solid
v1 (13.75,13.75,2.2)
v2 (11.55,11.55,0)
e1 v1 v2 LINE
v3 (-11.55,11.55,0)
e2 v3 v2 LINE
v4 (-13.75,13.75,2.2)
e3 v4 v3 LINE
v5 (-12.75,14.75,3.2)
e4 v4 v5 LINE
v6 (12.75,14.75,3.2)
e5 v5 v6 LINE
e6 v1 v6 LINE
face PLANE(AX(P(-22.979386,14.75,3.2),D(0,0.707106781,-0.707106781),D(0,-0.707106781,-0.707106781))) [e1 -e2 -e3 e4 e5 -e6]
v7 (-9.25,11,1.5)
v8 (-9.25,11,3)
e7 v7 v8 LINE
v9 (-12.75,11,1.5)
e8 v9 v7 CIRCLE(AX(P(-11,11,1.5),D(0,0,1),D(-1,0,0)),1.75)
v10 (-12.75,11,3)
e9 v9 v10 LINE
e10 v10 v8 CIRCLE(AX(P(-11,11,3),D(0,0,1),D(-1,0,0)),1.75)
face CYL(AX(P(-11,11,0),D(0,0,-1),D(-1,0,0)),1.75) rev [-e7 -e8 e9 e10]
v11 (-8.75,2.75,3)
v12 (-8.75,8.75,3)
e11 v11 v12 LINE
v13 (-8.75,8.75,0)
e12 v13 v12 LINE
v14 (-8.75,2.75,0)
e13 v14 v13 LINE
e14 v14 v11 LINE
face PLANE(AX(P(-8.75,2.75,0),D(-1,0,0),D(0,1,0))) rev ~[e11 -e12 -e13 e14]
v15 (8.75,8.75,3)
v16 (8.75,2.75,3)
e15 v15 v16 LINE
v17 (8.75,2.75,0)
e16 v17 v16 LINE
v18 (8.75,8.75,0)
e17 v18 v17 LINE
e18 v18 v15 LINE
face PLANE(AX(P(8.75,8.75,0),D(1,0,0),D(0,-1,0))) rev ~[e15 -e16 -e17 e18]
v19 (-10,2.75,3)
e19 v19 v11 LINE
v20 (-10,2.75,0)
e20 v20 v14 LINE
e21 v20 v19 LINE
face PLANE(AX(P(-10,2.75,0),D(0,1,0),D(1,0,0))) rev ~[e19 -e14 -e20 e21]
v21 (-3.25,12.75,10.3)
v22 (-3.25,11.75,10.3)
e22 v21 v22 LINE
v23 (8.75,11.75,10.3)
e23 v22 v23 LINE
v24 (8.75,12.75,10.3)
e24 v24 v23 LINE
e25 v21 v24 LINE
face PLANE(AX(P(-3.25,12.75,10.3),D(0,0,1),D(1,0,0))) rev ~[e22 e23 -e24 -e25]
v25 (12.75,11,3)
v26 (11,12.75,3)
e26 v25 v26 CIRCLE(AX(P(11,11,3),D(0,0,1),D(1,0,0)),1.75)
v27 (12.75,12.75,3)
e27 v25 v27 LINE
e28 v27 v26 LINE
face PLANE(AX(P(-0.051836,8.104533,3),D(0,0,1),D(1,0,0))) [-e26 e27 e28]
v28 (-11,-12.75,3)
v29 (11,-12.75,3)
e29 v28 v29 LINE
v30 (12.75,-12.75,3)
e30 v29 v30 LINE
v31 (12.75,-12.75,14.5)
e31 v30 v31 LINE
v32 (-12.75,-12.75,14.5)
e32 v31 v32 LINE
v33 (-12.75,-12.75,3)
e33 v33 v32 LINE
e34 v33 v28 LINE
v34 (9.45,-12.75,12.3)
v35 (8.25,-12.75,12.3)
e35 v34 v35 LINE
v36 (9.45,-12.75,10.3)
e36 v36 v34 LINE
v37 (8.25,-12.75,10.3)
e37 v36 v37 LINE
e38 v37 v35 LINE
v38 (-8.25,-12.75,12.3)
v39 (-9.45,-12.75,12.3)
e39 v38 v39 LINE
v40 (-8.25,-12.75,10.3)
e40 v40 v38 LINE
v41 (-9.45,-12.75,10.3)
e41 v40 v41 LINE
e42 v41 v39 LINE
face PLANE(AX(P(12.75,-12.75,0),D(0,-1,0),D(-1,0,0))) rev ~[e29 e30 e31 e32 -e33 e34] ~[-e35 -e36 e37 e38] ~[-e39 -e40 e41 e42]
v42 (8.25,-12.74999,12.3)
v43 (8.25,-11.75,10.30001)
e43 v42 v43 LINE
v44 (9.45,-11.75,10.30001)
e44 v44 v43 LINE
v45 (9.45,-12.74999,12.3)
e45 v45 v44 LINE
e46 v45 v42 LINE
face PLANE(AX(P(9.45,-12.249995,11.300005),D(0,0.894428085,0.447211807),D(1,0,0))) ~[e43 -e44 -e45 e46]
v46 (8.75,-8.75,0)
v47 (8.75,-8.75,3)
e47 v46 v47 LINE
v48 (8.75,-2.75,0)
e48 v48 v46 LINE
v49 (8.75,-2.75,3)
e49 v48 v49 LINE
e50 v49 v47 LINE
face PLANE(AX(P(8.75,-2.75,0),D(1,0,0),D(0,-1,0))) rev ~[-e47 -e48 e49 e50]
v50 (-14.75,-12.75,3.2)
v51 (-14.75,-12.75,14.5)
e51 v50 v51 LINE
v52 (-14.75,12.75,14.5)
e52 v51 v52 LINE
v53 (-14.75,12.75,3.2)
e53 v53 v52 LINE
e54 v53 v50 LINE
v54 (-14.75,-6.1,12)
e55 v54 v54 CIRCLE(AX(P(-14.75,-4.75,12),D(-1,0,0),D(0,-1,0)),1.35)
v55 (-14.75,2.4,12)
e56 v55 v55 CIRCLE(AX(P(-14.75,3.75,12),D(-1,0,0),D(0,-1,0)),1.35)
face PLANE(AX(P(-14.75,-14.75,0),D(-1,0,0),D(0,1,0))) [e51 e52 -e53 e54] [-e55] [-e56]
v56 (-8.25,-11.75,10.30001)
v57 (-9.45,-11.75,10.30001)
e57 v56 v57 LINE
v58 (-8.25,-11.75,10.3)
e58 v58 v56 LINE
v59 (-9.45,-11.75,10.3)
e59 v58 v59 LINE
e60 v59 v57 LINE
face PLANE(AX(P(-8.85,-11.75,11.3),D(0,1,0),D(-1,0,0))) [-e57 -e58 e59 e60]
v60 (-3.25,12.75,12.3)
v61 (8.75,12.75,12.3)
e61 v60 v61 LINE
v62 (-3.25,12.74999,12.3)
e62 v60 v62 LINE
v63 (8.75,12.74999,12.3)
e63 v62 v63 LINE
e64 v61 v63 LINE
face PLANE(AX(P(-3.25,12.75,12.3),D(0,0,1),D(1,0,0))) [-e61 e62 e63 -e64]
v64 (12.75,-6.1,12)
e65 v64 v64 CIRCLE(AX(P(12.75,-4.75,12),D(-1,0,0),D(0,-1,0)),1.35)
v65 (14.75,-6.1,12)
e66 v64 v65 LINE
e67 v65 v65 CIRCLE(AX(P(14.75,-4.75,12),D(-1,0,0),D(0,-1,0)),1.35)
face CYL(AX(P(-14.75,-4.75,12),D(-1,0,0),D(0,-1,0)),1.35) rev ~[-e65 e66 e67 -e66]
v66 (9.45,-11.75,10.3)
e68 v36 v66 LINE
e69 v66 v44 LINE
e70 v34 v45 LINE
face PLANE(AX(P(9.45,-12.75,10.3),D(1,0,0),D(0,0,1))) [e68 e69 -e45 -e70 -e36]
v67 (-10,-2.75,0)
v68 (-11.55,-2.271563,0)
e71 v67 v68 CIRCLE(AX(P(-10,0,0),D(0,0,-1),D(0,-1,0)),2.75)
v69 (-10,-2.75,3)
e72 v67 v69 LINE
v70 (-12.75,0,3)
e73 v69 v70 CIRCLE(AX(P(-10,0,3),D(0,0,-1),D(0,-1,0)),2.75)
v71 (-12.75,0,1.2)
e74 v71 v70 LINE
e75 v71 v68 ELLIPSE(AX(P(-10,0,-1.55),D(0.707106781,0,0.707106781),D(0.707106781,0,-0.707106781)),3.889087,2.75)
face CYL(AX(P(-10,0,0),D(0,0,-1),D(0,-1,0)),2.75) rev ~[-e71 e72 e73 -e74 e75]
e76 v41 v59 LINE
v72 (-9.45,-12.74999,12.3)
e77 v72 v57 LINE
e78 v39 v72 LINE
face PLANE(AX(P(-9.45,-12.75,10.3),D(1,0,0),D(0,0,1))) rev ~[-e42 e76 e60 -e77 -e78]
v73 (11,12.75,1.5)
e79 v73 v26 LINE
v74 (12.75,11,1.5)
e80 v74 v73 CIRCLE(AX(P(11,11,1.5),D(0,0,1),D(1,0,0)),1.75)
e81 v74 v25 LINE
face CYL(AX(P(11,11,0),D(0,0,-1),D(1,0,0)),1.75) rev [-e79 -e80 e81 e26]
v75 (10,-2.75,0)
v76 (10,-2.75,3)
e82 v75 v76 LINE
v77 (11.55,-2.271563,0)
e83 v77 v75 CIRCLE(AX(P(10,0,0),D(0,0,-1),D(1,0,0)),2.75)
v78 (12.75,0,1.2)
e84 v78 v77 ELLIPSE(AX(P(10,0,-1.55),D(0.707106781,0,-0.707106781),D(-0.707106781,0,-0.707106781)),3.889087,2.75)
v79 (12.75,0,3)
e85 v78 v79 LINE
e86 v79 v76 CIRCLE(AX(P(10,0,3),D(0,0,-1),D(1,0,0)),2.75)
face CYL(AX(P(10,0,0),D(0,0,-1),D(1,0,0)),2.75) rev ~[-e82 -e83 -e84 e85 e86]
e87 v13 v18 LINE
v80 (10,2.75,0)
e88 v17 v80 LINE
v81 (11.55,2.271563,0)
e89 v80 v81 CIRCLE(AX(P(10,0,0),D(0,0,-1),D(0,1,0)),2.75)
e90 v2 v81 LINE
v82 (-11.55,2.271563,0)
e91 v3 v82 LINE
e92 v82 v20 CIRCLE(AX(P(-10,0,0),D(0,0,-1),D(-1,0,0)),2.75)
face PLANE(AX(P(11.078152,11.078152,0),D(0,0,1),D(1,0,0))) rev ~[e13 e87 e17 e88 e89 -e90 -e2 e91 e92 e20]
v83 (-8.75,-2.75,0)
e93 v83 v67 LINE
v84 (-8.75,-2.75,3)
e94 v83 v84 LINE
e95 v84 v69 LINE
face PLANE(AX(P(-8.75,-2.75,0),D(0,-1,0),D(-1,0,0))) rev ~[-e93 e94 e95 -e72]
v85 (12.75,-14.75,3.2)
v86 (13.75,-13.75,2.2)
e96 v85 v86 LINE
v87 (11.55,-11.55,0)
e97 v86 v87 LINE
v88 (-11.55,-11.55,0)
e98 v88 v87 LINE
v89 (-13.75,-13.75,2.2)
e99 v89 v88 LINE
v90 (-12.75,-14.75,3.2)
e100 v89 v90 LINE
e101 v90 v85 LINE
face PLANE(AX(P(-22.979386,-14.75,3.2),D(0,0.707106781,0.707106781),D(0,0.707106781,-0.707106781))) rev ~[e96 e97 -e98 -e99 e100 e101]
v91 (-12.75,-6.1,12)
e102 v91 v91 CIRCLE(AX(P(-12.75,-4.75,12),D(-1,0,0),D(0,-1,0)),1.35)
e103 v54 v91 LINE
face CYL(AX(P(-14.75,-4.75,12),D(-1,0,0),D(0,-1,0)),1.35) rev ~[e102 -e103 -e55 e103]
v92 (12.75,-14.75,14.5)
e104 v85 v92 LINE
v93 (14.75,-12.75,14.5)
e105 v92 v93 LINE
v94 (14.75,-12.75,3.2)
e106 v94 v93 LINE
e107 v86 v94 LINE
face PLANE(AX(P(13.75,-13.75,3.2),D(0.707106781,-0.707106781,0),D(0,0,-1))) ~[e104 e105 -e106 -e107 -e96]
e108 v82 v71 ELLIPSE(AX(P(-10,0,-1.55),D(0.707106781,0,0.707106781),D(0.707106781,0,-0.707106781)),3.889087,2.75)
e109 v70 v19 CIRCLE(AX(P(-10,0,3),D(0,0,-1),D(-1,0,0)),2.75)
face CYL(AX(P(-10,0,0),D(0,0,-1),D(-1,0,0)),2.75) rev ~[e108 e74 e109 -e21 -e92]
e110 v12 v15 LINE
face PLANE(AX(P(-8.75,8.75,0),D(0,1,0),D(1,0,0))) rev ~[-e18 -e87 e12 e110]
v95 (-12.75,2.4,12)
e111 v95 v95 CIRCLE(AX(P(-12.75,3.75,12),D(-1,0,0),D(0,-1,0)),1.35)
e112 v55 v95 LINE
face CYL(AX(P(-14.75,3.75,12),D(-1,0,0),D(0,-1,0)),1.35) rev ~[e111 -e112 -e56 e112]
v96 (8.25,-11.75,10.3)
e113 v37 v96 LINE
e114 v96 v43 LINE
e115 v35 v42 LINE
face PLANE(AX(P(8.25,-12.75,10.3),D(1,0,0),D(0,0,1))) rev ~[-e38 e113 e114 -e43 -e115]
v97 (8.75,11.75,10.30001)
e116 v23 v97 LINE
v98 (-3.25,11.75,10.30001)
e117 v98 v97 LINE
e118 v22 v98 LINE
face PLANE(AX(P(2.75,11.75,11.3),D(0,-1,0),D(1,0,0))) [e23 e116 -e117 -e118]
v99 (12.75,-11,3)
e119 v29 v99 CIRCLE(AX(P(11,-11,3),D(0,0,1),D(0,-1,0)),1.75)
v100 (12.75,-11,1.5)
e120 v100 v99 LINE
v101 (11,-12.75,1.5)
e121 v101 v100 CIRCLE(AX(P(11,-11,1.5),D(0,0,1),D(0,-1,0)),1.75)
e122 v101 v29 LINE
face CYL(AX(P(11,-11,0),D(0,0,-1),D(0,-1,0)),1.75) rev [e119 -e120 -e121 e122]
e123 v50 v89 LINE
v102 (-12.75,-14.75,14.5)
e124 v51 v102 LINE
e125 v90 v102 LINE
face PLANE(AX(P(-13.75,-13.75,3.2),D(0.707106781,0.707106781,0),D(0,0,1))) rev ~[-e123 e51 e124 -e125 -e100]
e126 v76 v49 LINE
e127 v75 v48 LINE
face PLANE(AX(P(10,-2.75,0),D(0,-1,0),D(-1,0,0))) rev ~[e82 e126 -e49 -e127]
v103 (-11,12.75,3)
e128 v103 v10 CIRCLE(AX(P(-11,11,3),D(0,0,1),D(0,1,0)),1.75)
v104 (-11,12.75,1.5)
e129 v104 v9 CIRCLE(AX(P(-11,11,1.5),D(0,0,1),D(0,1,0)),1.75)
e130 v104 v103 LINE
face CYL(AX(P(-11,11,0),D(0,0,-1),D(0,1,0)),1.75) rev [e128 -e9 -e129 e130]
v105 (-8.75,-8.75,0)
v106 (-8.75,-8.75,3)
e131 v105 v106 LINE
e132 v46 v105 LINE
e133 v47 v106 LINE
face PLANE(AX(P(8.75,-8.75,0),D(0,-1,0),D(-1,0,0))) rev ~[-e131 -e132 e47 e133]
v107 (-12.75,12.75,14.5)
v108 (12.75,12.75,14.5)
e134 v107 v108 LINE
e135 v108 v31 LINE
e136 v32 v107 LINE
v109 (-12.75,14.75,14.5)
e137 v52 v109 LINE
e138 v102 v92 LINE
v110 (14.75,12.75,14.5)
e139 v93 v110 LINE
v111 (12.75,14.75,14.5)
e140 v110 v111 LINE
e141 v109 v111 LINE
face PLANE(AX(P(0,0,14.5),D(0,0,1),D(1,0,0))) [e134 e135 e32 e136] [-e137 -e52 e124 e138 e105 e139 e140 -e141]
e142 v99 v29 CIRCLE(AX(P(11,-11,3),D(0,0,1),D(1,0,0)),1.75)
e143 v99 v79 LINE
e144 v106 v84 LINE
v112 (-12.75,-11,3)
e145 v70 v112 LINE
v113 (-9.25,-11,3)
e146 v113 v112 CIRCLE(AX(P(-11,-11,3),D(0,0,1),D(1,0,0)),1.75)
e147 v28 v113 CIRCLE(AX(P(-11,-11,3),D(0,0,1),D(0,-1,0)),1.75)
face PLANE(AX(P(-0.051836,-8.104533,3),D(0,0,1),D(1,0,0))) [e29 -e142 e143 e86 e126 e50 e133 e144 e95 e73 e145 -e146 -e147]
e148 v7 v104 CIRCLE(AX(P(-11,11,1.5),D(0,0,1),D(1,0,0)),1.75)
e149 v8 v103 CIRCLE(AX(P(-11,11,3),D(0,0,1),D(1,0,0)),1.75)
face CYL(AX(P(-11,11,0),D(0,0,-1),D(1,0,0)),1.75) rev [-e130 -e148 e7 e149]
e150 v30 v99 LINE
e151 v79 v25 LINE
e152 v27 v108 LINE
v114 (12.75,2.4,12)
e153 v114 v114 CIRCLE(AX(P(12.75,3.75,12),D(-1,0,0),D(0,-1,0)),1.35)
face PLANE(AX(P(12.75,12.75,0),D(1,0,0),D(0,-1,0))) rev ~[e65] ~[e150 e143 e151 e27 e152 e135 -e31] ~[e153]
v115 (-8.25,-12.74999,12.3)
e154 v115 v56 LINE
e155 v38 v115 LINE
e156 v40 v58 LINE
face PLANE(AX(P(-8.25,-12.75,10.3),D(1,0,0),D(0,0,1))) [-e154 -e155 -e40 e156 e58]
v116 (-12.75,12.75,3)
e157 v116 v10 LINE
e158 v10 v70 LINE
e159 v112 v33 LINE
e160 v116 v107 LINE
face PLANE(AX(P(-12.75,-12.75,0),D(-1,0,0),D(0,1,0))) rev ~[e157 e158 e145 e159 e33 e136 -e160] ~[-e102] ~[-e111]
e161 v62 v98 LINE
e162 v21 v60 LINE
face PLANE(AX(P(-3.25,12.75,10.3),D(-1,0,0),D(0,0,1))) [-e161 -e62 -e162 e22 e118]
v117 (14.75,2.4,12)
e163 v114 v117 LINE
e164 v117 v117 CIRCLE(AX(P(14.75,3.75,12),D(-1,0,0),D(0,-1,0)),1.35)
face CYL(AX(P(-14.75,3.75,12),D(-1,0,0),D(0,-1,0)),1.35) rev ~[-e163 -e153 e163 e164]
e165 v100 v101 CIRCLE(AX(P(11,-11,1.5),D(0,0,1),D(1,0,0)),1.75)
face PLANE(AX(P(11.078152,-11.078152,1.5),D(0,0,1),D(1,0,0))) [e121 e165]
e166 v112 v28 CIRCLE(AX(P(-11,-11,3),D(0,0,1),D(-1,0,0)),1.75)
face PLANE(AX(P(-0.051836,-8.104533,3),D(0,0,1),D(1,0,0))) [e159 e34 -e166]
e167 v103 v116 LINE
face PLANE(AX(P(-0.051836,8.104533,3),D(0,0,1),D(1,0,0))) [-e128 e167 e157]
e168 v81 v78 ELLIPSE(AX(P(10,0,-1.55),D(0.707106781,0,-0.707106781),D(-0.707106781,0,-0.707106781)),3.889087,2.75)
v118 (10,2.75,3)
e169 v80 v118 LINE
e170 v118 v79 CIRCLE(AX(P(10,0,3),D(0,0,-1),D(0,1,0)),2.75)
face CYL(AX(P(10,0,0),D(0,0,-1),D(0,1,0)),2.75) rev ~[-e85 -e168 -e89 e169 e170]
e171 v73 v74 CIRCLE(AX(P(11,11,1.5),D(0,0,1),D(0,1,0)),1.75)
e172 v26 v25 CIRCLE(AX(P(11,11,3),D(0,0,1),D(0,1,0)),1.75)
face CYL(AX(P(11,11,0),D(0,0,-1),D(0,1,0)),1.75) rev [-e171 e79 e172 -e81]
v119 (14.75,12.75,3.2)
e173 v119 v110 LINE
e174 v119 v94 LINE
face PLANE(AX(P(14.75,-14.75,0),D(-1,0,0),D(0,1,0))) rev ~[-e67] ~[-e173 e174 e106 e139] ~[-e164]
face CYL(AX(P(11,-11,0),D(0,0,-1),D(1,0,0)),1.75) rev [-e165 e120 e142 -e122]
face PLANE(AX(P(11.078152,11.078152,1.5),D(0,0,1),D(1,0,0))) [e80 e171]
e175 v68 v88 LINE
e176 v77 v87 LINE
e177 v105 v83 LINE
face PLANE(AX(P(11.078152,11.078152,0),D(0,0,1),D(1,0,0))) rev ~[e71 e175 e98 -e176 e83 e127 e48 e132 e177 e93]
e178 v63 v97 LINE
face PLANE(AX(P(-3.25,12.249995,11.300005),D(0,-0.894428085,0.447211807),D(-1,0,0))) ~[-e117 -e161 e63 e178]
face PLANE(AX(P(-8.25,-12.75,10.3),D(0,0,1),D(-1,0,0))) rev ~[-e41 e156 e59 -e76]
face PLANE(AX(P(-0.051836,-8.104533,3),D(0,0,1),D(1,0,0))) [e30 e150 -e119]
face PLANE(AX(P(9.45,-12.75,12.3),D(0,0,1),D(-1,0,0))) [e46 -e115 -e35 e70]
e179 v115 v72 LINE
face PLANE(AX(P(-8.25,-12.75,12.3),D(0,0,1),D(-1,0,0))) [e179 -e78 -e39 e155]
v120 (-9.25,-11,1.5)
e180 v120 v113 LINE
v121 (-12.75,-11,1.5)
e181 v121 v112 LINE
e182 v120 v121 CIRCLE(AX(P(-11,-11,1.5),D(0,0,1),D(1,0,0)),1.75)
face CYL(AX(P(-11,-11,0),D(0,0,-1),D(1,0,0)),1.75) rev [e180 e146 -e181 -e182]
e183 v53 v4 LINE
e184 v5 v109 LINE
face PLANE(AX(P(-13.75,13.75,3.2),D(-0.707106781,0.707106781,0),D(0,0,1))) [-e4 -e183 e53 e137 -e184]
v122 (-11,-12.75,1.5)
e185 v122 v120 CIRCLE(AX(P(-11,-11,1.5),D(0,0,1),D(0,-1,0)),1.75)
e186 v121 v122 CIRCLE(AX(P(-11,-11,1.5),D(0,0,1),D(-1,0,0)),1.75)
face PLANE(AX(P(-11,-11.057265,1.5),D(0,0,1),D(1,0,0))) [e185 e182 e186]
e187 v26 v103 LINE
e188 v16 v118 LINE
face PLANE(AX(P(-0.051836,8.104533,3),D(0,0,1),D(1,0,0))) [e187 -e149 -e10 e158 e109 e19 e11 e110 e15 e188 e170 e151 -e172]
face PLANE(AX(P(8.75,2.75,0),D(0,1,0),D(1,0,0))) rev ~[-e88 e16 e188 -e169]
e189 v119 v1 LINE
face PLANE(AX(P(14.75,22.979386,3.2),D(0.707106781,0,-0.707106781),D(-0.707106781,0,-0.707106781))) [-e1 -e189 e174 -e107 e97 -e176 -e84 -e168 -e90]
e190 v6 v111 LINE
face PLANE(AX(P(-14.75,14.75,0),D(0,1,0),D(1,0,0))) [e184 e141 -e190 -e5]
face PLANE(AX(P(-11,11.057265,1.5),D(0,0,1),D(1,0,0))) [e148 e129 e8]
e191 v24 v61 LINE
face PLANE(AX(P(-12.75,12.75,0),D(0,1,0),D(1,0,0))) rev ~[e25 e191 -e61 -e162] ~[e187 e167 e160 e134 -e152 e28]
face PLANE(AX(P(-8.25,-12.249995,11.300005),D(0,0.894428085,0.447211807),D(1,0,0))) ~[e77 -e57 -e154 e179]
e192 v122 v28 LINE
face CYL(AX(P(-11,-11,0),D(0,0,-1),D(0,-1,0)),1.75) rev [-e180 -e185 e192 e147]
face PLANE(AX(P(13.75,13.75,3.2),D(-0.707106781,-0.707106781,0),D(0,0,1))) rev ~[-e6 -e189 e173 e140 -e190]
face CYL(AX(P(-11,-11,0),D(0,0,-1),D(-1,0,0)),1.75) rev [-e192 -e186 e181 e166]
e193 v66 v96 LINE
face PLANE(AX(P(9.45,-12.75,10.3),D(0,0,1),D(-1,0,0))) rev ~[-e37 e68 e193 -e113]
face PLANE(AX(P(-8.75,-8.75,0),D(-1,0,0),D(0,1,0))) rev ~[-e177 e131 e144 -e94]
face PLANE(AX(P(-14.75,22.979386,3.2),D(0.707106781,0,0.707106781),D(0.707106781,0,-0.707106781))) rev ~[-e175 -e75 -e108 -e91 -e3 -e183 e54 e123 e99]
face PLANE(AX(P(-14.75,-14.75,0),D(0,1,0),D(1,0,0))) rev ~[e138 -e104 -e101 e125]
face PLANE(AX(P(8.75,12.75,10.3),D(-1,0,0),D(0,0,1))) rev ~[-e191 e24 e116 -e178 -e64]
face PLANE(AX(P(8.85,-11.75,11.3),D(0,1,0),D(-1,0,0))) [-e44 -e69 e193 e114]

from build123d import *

# Parameters (mm, degrees)
F1_DEPTH     = 3
F0_W         = 29.5
F0_H         = 29.5
F2_DEPTH     = 14.5
F3_DEPTH     = 3
F4_DEPTH     = 1.5
F6_W         = 12
F6_H         = 2
F7_DEPTH     = 1
F8_SIZE2     = 1.99999
F8_SIZE      = 0.99999
F9_W         = 1.2
F9_H         = 2
F10_DEPTH    = 1
F11_SIZE2    = 1.99999
F11_SIZE     = 0.99999
F12_SIZE2    = 1.99999
F12_SIZE     = 0.99999
F13_T1_DEPTH = 45.958771123
F13_T3_DEPTH = 45.958771123
F5_R         = 1.35
F14_DEPTH    = 30
F15_SIZE     = 2


# Not quite as in the source:
# - a fillet or chamfer that OpenCascade refuses, or shapes differently, is made with other operations: its cross-section is extruded or revolved along the edge and cut away or added
# - a fillet or chamfer is up to 0.001 mm smaller than in the source, because OpenCascade refuses the exact size


with BuildPart() as f1:
    # F0 (on Top) → F1 (new body)
    with BuildSketch(Plane.XY):
        with BuildLine():
            ThreePointArc((12.75, 11), (9.7625631329, 9.7625631329), (11, 12.75))
            Line((11, 12.75), (-11, 12.75))
            ThreePointArc((-11, 12.75), (-9.7625631329, 12.2374368671), (-9.25, 11))
            ThreePointArc((-9.25, 11), (-11, 9.25), (-12.75, 11))
            Line((-12.75, 11), (-12.75, -5e-10))
            ThreePointArc((-12.75, -5e-10), (-11.9445436484, 1.9445436481), (-10, 2.75))
            Line((-10, 2.75), (-8.75, 2.75))
            Line((-8.75, 2.75), (-8.75, 8.75))
            Line((-8.75, 8.75), (8.75, 8.75))
            Line((8.75, 8.75), (8.75, 2.75))
            Line((8.75, 2.75), (10, 2.75))
            ThreePointArc((10, 2.75), (11.9445436484, 1.9445436481), (12.75, -5e-10))
            Line((12.75, -5e-10), (12.75, 11))
        make_face()
        with BuildLine():
            ThreePointArc((-12.75, 11), (-12.2374368671, 12.2374368671), (-11, 12.75))
            Line((-11, 12.75), (-12.75, 12.75))
            Line((-12.75, 12.75), (-12.75, 11))
        make_face()
        with BuildLine():
            Line((12.75, 11), (12.75, 12.75))
            Line((12.75, 12.75), (11, 12.75))
            ThreePointArc((11, 12.75), (12.2374368671, 12.2374368671), (12.75, 11))
        make_face()
        with BuildLine():
            ThreePointArc((12.75, 11), (12.2374368671, 12.2374368671), (11, 12.75))
            ThreePointArc((11, 12.75), (9.7625631329, 9.7625631329), (12.75, 11))
        make_face()
        with BuildLine():
            ThreePointArc((-9.25, 11), (-9.7625631329, 12.2374368671), (-11, 12.75))
            ThreePointArc((-11, 12.75), (-12.2374368671, 12.2374368671), (-12.75, 11))
            ThreePointArc((-12.75, 11), (-11, 9.25), (-9.25, 11))
        make_face()
    extrude(amount=F1_DEPTH)



with BuildPart() as f1b:
    # F0 (on Top) → F1, piece 2 (new body)
    with BuildSketch(Plane.XY):
        with BuildLine():
            Line((12.75, -11), (12.75, -5e-10))
            ThreePointArc((12.75, -5e-10), (11.9445436481, -1.9445436484), (10, -2.75))
            Line((10, -2.75), (8.75, -2.75))
            Line((8.75, -2.75), (8.75, -8.75))
            Line((8.75, -8.75), (-8.75, -8.75))
            Line((-8.75, -8.75), (-8.75, -2.75))
            Line((-8.75, -2.75), (-10, -2.75))
            ThreePointArc((-10, -2.75), (-11.9445436481, -1.9445436484), (-12.75, -5e-10))
            Line((-12.75, -5e-10), (-12.75, -11))
            ThreePointArc((-12.75, -11), (-11, -9.25), (-9.25, -11))
            ThreePointArc((-9.25, -11), (-9.7625631329, -12.2374368671), (-11, -12.75))
            Line((-11, -12.75), (11, -12.75))
            ThreePointArc((11, -12.75), (9.7625631329, -9.7625631329), (12.75, -11))
        make_face()
        with BuildLine():
            ThreePointArc((-11, -12.75), (-12.2374368671, -12.2374368671), (-12.75, -11))
            Line((-12.75, -11), (-12.75, -12.75))
            Line((-12.75, -12.75), (-11, -12.75))
        make_face()
        with BuildLine():
            Line((12.75, -12.75), (12.75, -11))
            ThreePointArc((12.75, -11), (12.2374368671, -12.2374368671), (11, -12.75))
            Line((11, -12.75), (12.75, -12.75))
        make_face()
        with BuildLine():
            ThreePointArc((11, -12.75), (12.2374368671, -12.2374368671), (12.75, -11))
            ThreePointArc((12.75, -11), (9.7625631329, -9.7625631329), (11, -12.75))
        make_face()
        with BuildLine():
            ThreePointArc((-9.25, -11), (-11, -9.25), (-12.75, -11))
            ThreePointArc((-12.75, -11), (-12.2374368671, -12.2374368671), (-11, -12.75))
            ThreePointArc((-11, -12.75), (-9.7625631329, -12.2374368671), (-9.25, -11))
        make_face()
    extrude(amount=F1_DEPTH)


with BuildPart() as f1_1:
    add(f1.part)

    add(f1b.part)  # F2 merges F1b
    # F0 (on Top) → F2 (join)
    with BuildSketch(Plane.XY):
        Rectangle(F0_W, F0_H)
        Polygon((11, 12.75), (12.75, 12.75), (12.75, 11), (12.75, -5e-10), (12.75, -11), (12.75, -12.75), (11, -12.75), (-11, -12.75), (-12.75, -12.75), (-12.75, -11), (-12.75, -5e-10), (-12.75, 11), (-12.75, 12.75), (-11, 12.75), align=None, mode=Mode.SUBTRACT)
    extrude(amount=F2_DEPTH)

    # F0 (on Top) → F3 (cut)
    with BuildSketch(Plane.XY):
        with BuildLine():
            ThreePointArc((-9.25, 11), (-9.7625631329, 12.2374368671), (-11, 12.75))
            ThreePointArc((-11, 12.75), (-12.2374368671, 12.2374368671), (-12.75, 11))
            ThreePointArc((-12.75, 11), (-11, 9.25), (-9.25, 11))
        make_face()
        with BuildLine():
            ThreePointArc((12.75, 11), (12.2374368671, 12.2374368671), (11, 12.75))
            ThreePointArc((11, 12.75), (9.7625631329, 9.7625631329), (12.75, 11))
        make_face()
        with BuildLine():
            ThreePointArc((-9.25, -11), (-11, -9.25), (-12.75, -11))
            ThreePointArc((-12.75, -11), (-12.2374368671, -12.2374368671), (-11, -12.75))
            ThreePointArc((-11, -12.75), (-9.7625631329, -12.2374368671), (-9.25, -11))
        make_face()
        with BuildLine():
            ThreePointArc((11, -12.75), (12.2374368671, -12.2374368671), (12.75, -11))
            ThreePointArc((12.75, -11), (9.7625631329, -9.7625631329), (11, -12.75))
        make_face()
    extrude(amount=F3_DEPTH, mode=Mode.SUBTRACT)

    # F0 (on Top) → F4 (join)
    with BuildSketch(Plane.XY):
        with BuildLine():
            ThreePointArc((12.75, 11), (12.2374368671, 12.2374368671), (11, 12.75))
            ThreePointArc((11, 12.75), (9.7625631329, 9.7625631329), (12.75, 11))
        make_face()
        with BuildLine():
            ThreePointArc((-9.25, 11), (-9.7625631329, 12.2374368671), (-11, 12.75))
            ThreePointArc((-11, 12.75), (-12.2374368671, 12.2374368671), (-12.75, 11))
            ThreePointArc((-12.75, 11), (-11, 9.25), (-9.25, 11))
        make_face()
        with BuildLine():
            ThreePointArc((-9.25, -11), (-11, -9.25), (-12.75, -11))
            ThreePointArc((-12.75, -11), (-12.2374368671, -12.2374368671), (-11, -12.75))
            ThreePointArc((-11, -12.75), (-9.7625631329, -12.2374368671), (-9.25, -11))
        make_face()
        with BuildLine():
            ThreePointArc((11, -12.75), (12.2374368671, -12.2374368671), (12.75, -11))
            ThreePointArc((12.75, -11), (9.7625631329, -9.7625631329), (11, -12.75))
        make_face()
    extrude(amount=F4_DEPTH)

    # F6 (on face) → F7 (join)
    with BuildSketch(Plane.XZ.offset(-12.75)):
        with Locations((2.75, 11.3)):
            Rectangle(F6_W, F6_H)
    extrude(amount=F7_DEPTH)

    # F8 (size 1 and 2 in the source; OpenCascade refuses exactly that, so slightly less here)
    f8_edges = [f1_1.edges().sort_by_distance(p)[0] for p in [
        (2.75, 11.75, 12.3),
    ]]
    f8_side = f1_1.faces().sort_by_distance((2.75, 12.25, 12.3))[0]
    chamfer(f8_edges, length=F8_SIZE, length2=F8_SIZE2, reference=f8_side)

    # F9 (on face) → F10 (join)
    with BuildSketch(Plane(origin=(0, -12.75, 0), x_dir=(-1, 0, 0), z_dir=(0, 1, 0))):
        with Locations((-8.85, 11.3)):
            Rectangle(F9_W, F9_H)
        with Locations((8.85, 11.3)):
            Rectangle(F9_W, F9_H)
    extrude(amount=F10_DEPTH)

    # F11 (size 1 and 2 in the source; OpenCascade refuses exactly that, so slightly less here)
    f11_edges = [f1_1.edges().sort_by_distance(p)[0] for p in [
        (8.85, -11.75, 12.3),
    ]]
    f11_side = f1_1.faces().sort_by_distance((8.85, -12.25, 12.3))[0]
    chamfer(f11_edges, length=F11_SIZE, length2=F11_SIZE2, reference=f11_side)

    # F12 (size 1 and 2 in the source; OpenCascade refuses exactly that, so slightly less here)
    f12_edges = [f1_1.edges().sort_by_distance(p)[0] for p in [
        (-8.85, -11.75, 12.3),
    ]]
    f12_side = f1_1.faces().sort_by_distance((-8.85, -12.25, 12.3))[0]
    chamfer(f12_edges, length=F12_SIZE, length2=F12_SIZE2, reference=f12_side)

    # F13: chamfer of 3.2 on 4 edges, made by hand

    # F13_s2 → F13_t1 (cut)
    with BuildSketch(Plane.YZ.offset(-22.9793855615)):
        Polygon((14.75, 3.2), (11.55, 0), (14.75, 0), align=None)
        Polygon((-14.75, 3.2), (-11.55, 0), (-14.75, 0), align=None)
    extrude(amount=F13_T1_DEPTH, mode=Mode.SUBTRACT)

    # F13_s4 → F13_t3 (cut)
    with BuildSketch(Plane.XZ.offset(-22.9793855615)):
        Polygon((-14.75, 3.2), (-11.55, 0), (-14.75, 0), align=None)
        Polygon((14.75, 3.2), (11.55, 0), (14.75, 0), align=None)
    extrude(amount=F13_T3_DEPTH, mode=Mode.SUBTRACT)

    # F5 (on face) → F14 (cut)
    with BuildSketch(Plane(origin=(-14.75, 0, 0), x_dir=(0, -1, 0), z_dir=(-1, 0, 0))):
        with Locations((4.75, 12)):
            Circle(F5_R)
        with Locations((-3.75, 12)):
            Circle(F5_R)
    extrude(amount=-F14_DEPTH, mode=Mode.SUBTRACT)

    # F15
    f15_edges = [f1_1.edges().sort_by_distance(p)[0] for p in [
        (14.75, 14.75, 8.85),
        (-14.75, 14.75, 8.85),
        (14.75, -14.75, 8.85),
        (-14.75, -14.75, 8.85),
    ]]
    chamfer(f15_edges, length=F15_SIZE)


solid = f1_1.part
